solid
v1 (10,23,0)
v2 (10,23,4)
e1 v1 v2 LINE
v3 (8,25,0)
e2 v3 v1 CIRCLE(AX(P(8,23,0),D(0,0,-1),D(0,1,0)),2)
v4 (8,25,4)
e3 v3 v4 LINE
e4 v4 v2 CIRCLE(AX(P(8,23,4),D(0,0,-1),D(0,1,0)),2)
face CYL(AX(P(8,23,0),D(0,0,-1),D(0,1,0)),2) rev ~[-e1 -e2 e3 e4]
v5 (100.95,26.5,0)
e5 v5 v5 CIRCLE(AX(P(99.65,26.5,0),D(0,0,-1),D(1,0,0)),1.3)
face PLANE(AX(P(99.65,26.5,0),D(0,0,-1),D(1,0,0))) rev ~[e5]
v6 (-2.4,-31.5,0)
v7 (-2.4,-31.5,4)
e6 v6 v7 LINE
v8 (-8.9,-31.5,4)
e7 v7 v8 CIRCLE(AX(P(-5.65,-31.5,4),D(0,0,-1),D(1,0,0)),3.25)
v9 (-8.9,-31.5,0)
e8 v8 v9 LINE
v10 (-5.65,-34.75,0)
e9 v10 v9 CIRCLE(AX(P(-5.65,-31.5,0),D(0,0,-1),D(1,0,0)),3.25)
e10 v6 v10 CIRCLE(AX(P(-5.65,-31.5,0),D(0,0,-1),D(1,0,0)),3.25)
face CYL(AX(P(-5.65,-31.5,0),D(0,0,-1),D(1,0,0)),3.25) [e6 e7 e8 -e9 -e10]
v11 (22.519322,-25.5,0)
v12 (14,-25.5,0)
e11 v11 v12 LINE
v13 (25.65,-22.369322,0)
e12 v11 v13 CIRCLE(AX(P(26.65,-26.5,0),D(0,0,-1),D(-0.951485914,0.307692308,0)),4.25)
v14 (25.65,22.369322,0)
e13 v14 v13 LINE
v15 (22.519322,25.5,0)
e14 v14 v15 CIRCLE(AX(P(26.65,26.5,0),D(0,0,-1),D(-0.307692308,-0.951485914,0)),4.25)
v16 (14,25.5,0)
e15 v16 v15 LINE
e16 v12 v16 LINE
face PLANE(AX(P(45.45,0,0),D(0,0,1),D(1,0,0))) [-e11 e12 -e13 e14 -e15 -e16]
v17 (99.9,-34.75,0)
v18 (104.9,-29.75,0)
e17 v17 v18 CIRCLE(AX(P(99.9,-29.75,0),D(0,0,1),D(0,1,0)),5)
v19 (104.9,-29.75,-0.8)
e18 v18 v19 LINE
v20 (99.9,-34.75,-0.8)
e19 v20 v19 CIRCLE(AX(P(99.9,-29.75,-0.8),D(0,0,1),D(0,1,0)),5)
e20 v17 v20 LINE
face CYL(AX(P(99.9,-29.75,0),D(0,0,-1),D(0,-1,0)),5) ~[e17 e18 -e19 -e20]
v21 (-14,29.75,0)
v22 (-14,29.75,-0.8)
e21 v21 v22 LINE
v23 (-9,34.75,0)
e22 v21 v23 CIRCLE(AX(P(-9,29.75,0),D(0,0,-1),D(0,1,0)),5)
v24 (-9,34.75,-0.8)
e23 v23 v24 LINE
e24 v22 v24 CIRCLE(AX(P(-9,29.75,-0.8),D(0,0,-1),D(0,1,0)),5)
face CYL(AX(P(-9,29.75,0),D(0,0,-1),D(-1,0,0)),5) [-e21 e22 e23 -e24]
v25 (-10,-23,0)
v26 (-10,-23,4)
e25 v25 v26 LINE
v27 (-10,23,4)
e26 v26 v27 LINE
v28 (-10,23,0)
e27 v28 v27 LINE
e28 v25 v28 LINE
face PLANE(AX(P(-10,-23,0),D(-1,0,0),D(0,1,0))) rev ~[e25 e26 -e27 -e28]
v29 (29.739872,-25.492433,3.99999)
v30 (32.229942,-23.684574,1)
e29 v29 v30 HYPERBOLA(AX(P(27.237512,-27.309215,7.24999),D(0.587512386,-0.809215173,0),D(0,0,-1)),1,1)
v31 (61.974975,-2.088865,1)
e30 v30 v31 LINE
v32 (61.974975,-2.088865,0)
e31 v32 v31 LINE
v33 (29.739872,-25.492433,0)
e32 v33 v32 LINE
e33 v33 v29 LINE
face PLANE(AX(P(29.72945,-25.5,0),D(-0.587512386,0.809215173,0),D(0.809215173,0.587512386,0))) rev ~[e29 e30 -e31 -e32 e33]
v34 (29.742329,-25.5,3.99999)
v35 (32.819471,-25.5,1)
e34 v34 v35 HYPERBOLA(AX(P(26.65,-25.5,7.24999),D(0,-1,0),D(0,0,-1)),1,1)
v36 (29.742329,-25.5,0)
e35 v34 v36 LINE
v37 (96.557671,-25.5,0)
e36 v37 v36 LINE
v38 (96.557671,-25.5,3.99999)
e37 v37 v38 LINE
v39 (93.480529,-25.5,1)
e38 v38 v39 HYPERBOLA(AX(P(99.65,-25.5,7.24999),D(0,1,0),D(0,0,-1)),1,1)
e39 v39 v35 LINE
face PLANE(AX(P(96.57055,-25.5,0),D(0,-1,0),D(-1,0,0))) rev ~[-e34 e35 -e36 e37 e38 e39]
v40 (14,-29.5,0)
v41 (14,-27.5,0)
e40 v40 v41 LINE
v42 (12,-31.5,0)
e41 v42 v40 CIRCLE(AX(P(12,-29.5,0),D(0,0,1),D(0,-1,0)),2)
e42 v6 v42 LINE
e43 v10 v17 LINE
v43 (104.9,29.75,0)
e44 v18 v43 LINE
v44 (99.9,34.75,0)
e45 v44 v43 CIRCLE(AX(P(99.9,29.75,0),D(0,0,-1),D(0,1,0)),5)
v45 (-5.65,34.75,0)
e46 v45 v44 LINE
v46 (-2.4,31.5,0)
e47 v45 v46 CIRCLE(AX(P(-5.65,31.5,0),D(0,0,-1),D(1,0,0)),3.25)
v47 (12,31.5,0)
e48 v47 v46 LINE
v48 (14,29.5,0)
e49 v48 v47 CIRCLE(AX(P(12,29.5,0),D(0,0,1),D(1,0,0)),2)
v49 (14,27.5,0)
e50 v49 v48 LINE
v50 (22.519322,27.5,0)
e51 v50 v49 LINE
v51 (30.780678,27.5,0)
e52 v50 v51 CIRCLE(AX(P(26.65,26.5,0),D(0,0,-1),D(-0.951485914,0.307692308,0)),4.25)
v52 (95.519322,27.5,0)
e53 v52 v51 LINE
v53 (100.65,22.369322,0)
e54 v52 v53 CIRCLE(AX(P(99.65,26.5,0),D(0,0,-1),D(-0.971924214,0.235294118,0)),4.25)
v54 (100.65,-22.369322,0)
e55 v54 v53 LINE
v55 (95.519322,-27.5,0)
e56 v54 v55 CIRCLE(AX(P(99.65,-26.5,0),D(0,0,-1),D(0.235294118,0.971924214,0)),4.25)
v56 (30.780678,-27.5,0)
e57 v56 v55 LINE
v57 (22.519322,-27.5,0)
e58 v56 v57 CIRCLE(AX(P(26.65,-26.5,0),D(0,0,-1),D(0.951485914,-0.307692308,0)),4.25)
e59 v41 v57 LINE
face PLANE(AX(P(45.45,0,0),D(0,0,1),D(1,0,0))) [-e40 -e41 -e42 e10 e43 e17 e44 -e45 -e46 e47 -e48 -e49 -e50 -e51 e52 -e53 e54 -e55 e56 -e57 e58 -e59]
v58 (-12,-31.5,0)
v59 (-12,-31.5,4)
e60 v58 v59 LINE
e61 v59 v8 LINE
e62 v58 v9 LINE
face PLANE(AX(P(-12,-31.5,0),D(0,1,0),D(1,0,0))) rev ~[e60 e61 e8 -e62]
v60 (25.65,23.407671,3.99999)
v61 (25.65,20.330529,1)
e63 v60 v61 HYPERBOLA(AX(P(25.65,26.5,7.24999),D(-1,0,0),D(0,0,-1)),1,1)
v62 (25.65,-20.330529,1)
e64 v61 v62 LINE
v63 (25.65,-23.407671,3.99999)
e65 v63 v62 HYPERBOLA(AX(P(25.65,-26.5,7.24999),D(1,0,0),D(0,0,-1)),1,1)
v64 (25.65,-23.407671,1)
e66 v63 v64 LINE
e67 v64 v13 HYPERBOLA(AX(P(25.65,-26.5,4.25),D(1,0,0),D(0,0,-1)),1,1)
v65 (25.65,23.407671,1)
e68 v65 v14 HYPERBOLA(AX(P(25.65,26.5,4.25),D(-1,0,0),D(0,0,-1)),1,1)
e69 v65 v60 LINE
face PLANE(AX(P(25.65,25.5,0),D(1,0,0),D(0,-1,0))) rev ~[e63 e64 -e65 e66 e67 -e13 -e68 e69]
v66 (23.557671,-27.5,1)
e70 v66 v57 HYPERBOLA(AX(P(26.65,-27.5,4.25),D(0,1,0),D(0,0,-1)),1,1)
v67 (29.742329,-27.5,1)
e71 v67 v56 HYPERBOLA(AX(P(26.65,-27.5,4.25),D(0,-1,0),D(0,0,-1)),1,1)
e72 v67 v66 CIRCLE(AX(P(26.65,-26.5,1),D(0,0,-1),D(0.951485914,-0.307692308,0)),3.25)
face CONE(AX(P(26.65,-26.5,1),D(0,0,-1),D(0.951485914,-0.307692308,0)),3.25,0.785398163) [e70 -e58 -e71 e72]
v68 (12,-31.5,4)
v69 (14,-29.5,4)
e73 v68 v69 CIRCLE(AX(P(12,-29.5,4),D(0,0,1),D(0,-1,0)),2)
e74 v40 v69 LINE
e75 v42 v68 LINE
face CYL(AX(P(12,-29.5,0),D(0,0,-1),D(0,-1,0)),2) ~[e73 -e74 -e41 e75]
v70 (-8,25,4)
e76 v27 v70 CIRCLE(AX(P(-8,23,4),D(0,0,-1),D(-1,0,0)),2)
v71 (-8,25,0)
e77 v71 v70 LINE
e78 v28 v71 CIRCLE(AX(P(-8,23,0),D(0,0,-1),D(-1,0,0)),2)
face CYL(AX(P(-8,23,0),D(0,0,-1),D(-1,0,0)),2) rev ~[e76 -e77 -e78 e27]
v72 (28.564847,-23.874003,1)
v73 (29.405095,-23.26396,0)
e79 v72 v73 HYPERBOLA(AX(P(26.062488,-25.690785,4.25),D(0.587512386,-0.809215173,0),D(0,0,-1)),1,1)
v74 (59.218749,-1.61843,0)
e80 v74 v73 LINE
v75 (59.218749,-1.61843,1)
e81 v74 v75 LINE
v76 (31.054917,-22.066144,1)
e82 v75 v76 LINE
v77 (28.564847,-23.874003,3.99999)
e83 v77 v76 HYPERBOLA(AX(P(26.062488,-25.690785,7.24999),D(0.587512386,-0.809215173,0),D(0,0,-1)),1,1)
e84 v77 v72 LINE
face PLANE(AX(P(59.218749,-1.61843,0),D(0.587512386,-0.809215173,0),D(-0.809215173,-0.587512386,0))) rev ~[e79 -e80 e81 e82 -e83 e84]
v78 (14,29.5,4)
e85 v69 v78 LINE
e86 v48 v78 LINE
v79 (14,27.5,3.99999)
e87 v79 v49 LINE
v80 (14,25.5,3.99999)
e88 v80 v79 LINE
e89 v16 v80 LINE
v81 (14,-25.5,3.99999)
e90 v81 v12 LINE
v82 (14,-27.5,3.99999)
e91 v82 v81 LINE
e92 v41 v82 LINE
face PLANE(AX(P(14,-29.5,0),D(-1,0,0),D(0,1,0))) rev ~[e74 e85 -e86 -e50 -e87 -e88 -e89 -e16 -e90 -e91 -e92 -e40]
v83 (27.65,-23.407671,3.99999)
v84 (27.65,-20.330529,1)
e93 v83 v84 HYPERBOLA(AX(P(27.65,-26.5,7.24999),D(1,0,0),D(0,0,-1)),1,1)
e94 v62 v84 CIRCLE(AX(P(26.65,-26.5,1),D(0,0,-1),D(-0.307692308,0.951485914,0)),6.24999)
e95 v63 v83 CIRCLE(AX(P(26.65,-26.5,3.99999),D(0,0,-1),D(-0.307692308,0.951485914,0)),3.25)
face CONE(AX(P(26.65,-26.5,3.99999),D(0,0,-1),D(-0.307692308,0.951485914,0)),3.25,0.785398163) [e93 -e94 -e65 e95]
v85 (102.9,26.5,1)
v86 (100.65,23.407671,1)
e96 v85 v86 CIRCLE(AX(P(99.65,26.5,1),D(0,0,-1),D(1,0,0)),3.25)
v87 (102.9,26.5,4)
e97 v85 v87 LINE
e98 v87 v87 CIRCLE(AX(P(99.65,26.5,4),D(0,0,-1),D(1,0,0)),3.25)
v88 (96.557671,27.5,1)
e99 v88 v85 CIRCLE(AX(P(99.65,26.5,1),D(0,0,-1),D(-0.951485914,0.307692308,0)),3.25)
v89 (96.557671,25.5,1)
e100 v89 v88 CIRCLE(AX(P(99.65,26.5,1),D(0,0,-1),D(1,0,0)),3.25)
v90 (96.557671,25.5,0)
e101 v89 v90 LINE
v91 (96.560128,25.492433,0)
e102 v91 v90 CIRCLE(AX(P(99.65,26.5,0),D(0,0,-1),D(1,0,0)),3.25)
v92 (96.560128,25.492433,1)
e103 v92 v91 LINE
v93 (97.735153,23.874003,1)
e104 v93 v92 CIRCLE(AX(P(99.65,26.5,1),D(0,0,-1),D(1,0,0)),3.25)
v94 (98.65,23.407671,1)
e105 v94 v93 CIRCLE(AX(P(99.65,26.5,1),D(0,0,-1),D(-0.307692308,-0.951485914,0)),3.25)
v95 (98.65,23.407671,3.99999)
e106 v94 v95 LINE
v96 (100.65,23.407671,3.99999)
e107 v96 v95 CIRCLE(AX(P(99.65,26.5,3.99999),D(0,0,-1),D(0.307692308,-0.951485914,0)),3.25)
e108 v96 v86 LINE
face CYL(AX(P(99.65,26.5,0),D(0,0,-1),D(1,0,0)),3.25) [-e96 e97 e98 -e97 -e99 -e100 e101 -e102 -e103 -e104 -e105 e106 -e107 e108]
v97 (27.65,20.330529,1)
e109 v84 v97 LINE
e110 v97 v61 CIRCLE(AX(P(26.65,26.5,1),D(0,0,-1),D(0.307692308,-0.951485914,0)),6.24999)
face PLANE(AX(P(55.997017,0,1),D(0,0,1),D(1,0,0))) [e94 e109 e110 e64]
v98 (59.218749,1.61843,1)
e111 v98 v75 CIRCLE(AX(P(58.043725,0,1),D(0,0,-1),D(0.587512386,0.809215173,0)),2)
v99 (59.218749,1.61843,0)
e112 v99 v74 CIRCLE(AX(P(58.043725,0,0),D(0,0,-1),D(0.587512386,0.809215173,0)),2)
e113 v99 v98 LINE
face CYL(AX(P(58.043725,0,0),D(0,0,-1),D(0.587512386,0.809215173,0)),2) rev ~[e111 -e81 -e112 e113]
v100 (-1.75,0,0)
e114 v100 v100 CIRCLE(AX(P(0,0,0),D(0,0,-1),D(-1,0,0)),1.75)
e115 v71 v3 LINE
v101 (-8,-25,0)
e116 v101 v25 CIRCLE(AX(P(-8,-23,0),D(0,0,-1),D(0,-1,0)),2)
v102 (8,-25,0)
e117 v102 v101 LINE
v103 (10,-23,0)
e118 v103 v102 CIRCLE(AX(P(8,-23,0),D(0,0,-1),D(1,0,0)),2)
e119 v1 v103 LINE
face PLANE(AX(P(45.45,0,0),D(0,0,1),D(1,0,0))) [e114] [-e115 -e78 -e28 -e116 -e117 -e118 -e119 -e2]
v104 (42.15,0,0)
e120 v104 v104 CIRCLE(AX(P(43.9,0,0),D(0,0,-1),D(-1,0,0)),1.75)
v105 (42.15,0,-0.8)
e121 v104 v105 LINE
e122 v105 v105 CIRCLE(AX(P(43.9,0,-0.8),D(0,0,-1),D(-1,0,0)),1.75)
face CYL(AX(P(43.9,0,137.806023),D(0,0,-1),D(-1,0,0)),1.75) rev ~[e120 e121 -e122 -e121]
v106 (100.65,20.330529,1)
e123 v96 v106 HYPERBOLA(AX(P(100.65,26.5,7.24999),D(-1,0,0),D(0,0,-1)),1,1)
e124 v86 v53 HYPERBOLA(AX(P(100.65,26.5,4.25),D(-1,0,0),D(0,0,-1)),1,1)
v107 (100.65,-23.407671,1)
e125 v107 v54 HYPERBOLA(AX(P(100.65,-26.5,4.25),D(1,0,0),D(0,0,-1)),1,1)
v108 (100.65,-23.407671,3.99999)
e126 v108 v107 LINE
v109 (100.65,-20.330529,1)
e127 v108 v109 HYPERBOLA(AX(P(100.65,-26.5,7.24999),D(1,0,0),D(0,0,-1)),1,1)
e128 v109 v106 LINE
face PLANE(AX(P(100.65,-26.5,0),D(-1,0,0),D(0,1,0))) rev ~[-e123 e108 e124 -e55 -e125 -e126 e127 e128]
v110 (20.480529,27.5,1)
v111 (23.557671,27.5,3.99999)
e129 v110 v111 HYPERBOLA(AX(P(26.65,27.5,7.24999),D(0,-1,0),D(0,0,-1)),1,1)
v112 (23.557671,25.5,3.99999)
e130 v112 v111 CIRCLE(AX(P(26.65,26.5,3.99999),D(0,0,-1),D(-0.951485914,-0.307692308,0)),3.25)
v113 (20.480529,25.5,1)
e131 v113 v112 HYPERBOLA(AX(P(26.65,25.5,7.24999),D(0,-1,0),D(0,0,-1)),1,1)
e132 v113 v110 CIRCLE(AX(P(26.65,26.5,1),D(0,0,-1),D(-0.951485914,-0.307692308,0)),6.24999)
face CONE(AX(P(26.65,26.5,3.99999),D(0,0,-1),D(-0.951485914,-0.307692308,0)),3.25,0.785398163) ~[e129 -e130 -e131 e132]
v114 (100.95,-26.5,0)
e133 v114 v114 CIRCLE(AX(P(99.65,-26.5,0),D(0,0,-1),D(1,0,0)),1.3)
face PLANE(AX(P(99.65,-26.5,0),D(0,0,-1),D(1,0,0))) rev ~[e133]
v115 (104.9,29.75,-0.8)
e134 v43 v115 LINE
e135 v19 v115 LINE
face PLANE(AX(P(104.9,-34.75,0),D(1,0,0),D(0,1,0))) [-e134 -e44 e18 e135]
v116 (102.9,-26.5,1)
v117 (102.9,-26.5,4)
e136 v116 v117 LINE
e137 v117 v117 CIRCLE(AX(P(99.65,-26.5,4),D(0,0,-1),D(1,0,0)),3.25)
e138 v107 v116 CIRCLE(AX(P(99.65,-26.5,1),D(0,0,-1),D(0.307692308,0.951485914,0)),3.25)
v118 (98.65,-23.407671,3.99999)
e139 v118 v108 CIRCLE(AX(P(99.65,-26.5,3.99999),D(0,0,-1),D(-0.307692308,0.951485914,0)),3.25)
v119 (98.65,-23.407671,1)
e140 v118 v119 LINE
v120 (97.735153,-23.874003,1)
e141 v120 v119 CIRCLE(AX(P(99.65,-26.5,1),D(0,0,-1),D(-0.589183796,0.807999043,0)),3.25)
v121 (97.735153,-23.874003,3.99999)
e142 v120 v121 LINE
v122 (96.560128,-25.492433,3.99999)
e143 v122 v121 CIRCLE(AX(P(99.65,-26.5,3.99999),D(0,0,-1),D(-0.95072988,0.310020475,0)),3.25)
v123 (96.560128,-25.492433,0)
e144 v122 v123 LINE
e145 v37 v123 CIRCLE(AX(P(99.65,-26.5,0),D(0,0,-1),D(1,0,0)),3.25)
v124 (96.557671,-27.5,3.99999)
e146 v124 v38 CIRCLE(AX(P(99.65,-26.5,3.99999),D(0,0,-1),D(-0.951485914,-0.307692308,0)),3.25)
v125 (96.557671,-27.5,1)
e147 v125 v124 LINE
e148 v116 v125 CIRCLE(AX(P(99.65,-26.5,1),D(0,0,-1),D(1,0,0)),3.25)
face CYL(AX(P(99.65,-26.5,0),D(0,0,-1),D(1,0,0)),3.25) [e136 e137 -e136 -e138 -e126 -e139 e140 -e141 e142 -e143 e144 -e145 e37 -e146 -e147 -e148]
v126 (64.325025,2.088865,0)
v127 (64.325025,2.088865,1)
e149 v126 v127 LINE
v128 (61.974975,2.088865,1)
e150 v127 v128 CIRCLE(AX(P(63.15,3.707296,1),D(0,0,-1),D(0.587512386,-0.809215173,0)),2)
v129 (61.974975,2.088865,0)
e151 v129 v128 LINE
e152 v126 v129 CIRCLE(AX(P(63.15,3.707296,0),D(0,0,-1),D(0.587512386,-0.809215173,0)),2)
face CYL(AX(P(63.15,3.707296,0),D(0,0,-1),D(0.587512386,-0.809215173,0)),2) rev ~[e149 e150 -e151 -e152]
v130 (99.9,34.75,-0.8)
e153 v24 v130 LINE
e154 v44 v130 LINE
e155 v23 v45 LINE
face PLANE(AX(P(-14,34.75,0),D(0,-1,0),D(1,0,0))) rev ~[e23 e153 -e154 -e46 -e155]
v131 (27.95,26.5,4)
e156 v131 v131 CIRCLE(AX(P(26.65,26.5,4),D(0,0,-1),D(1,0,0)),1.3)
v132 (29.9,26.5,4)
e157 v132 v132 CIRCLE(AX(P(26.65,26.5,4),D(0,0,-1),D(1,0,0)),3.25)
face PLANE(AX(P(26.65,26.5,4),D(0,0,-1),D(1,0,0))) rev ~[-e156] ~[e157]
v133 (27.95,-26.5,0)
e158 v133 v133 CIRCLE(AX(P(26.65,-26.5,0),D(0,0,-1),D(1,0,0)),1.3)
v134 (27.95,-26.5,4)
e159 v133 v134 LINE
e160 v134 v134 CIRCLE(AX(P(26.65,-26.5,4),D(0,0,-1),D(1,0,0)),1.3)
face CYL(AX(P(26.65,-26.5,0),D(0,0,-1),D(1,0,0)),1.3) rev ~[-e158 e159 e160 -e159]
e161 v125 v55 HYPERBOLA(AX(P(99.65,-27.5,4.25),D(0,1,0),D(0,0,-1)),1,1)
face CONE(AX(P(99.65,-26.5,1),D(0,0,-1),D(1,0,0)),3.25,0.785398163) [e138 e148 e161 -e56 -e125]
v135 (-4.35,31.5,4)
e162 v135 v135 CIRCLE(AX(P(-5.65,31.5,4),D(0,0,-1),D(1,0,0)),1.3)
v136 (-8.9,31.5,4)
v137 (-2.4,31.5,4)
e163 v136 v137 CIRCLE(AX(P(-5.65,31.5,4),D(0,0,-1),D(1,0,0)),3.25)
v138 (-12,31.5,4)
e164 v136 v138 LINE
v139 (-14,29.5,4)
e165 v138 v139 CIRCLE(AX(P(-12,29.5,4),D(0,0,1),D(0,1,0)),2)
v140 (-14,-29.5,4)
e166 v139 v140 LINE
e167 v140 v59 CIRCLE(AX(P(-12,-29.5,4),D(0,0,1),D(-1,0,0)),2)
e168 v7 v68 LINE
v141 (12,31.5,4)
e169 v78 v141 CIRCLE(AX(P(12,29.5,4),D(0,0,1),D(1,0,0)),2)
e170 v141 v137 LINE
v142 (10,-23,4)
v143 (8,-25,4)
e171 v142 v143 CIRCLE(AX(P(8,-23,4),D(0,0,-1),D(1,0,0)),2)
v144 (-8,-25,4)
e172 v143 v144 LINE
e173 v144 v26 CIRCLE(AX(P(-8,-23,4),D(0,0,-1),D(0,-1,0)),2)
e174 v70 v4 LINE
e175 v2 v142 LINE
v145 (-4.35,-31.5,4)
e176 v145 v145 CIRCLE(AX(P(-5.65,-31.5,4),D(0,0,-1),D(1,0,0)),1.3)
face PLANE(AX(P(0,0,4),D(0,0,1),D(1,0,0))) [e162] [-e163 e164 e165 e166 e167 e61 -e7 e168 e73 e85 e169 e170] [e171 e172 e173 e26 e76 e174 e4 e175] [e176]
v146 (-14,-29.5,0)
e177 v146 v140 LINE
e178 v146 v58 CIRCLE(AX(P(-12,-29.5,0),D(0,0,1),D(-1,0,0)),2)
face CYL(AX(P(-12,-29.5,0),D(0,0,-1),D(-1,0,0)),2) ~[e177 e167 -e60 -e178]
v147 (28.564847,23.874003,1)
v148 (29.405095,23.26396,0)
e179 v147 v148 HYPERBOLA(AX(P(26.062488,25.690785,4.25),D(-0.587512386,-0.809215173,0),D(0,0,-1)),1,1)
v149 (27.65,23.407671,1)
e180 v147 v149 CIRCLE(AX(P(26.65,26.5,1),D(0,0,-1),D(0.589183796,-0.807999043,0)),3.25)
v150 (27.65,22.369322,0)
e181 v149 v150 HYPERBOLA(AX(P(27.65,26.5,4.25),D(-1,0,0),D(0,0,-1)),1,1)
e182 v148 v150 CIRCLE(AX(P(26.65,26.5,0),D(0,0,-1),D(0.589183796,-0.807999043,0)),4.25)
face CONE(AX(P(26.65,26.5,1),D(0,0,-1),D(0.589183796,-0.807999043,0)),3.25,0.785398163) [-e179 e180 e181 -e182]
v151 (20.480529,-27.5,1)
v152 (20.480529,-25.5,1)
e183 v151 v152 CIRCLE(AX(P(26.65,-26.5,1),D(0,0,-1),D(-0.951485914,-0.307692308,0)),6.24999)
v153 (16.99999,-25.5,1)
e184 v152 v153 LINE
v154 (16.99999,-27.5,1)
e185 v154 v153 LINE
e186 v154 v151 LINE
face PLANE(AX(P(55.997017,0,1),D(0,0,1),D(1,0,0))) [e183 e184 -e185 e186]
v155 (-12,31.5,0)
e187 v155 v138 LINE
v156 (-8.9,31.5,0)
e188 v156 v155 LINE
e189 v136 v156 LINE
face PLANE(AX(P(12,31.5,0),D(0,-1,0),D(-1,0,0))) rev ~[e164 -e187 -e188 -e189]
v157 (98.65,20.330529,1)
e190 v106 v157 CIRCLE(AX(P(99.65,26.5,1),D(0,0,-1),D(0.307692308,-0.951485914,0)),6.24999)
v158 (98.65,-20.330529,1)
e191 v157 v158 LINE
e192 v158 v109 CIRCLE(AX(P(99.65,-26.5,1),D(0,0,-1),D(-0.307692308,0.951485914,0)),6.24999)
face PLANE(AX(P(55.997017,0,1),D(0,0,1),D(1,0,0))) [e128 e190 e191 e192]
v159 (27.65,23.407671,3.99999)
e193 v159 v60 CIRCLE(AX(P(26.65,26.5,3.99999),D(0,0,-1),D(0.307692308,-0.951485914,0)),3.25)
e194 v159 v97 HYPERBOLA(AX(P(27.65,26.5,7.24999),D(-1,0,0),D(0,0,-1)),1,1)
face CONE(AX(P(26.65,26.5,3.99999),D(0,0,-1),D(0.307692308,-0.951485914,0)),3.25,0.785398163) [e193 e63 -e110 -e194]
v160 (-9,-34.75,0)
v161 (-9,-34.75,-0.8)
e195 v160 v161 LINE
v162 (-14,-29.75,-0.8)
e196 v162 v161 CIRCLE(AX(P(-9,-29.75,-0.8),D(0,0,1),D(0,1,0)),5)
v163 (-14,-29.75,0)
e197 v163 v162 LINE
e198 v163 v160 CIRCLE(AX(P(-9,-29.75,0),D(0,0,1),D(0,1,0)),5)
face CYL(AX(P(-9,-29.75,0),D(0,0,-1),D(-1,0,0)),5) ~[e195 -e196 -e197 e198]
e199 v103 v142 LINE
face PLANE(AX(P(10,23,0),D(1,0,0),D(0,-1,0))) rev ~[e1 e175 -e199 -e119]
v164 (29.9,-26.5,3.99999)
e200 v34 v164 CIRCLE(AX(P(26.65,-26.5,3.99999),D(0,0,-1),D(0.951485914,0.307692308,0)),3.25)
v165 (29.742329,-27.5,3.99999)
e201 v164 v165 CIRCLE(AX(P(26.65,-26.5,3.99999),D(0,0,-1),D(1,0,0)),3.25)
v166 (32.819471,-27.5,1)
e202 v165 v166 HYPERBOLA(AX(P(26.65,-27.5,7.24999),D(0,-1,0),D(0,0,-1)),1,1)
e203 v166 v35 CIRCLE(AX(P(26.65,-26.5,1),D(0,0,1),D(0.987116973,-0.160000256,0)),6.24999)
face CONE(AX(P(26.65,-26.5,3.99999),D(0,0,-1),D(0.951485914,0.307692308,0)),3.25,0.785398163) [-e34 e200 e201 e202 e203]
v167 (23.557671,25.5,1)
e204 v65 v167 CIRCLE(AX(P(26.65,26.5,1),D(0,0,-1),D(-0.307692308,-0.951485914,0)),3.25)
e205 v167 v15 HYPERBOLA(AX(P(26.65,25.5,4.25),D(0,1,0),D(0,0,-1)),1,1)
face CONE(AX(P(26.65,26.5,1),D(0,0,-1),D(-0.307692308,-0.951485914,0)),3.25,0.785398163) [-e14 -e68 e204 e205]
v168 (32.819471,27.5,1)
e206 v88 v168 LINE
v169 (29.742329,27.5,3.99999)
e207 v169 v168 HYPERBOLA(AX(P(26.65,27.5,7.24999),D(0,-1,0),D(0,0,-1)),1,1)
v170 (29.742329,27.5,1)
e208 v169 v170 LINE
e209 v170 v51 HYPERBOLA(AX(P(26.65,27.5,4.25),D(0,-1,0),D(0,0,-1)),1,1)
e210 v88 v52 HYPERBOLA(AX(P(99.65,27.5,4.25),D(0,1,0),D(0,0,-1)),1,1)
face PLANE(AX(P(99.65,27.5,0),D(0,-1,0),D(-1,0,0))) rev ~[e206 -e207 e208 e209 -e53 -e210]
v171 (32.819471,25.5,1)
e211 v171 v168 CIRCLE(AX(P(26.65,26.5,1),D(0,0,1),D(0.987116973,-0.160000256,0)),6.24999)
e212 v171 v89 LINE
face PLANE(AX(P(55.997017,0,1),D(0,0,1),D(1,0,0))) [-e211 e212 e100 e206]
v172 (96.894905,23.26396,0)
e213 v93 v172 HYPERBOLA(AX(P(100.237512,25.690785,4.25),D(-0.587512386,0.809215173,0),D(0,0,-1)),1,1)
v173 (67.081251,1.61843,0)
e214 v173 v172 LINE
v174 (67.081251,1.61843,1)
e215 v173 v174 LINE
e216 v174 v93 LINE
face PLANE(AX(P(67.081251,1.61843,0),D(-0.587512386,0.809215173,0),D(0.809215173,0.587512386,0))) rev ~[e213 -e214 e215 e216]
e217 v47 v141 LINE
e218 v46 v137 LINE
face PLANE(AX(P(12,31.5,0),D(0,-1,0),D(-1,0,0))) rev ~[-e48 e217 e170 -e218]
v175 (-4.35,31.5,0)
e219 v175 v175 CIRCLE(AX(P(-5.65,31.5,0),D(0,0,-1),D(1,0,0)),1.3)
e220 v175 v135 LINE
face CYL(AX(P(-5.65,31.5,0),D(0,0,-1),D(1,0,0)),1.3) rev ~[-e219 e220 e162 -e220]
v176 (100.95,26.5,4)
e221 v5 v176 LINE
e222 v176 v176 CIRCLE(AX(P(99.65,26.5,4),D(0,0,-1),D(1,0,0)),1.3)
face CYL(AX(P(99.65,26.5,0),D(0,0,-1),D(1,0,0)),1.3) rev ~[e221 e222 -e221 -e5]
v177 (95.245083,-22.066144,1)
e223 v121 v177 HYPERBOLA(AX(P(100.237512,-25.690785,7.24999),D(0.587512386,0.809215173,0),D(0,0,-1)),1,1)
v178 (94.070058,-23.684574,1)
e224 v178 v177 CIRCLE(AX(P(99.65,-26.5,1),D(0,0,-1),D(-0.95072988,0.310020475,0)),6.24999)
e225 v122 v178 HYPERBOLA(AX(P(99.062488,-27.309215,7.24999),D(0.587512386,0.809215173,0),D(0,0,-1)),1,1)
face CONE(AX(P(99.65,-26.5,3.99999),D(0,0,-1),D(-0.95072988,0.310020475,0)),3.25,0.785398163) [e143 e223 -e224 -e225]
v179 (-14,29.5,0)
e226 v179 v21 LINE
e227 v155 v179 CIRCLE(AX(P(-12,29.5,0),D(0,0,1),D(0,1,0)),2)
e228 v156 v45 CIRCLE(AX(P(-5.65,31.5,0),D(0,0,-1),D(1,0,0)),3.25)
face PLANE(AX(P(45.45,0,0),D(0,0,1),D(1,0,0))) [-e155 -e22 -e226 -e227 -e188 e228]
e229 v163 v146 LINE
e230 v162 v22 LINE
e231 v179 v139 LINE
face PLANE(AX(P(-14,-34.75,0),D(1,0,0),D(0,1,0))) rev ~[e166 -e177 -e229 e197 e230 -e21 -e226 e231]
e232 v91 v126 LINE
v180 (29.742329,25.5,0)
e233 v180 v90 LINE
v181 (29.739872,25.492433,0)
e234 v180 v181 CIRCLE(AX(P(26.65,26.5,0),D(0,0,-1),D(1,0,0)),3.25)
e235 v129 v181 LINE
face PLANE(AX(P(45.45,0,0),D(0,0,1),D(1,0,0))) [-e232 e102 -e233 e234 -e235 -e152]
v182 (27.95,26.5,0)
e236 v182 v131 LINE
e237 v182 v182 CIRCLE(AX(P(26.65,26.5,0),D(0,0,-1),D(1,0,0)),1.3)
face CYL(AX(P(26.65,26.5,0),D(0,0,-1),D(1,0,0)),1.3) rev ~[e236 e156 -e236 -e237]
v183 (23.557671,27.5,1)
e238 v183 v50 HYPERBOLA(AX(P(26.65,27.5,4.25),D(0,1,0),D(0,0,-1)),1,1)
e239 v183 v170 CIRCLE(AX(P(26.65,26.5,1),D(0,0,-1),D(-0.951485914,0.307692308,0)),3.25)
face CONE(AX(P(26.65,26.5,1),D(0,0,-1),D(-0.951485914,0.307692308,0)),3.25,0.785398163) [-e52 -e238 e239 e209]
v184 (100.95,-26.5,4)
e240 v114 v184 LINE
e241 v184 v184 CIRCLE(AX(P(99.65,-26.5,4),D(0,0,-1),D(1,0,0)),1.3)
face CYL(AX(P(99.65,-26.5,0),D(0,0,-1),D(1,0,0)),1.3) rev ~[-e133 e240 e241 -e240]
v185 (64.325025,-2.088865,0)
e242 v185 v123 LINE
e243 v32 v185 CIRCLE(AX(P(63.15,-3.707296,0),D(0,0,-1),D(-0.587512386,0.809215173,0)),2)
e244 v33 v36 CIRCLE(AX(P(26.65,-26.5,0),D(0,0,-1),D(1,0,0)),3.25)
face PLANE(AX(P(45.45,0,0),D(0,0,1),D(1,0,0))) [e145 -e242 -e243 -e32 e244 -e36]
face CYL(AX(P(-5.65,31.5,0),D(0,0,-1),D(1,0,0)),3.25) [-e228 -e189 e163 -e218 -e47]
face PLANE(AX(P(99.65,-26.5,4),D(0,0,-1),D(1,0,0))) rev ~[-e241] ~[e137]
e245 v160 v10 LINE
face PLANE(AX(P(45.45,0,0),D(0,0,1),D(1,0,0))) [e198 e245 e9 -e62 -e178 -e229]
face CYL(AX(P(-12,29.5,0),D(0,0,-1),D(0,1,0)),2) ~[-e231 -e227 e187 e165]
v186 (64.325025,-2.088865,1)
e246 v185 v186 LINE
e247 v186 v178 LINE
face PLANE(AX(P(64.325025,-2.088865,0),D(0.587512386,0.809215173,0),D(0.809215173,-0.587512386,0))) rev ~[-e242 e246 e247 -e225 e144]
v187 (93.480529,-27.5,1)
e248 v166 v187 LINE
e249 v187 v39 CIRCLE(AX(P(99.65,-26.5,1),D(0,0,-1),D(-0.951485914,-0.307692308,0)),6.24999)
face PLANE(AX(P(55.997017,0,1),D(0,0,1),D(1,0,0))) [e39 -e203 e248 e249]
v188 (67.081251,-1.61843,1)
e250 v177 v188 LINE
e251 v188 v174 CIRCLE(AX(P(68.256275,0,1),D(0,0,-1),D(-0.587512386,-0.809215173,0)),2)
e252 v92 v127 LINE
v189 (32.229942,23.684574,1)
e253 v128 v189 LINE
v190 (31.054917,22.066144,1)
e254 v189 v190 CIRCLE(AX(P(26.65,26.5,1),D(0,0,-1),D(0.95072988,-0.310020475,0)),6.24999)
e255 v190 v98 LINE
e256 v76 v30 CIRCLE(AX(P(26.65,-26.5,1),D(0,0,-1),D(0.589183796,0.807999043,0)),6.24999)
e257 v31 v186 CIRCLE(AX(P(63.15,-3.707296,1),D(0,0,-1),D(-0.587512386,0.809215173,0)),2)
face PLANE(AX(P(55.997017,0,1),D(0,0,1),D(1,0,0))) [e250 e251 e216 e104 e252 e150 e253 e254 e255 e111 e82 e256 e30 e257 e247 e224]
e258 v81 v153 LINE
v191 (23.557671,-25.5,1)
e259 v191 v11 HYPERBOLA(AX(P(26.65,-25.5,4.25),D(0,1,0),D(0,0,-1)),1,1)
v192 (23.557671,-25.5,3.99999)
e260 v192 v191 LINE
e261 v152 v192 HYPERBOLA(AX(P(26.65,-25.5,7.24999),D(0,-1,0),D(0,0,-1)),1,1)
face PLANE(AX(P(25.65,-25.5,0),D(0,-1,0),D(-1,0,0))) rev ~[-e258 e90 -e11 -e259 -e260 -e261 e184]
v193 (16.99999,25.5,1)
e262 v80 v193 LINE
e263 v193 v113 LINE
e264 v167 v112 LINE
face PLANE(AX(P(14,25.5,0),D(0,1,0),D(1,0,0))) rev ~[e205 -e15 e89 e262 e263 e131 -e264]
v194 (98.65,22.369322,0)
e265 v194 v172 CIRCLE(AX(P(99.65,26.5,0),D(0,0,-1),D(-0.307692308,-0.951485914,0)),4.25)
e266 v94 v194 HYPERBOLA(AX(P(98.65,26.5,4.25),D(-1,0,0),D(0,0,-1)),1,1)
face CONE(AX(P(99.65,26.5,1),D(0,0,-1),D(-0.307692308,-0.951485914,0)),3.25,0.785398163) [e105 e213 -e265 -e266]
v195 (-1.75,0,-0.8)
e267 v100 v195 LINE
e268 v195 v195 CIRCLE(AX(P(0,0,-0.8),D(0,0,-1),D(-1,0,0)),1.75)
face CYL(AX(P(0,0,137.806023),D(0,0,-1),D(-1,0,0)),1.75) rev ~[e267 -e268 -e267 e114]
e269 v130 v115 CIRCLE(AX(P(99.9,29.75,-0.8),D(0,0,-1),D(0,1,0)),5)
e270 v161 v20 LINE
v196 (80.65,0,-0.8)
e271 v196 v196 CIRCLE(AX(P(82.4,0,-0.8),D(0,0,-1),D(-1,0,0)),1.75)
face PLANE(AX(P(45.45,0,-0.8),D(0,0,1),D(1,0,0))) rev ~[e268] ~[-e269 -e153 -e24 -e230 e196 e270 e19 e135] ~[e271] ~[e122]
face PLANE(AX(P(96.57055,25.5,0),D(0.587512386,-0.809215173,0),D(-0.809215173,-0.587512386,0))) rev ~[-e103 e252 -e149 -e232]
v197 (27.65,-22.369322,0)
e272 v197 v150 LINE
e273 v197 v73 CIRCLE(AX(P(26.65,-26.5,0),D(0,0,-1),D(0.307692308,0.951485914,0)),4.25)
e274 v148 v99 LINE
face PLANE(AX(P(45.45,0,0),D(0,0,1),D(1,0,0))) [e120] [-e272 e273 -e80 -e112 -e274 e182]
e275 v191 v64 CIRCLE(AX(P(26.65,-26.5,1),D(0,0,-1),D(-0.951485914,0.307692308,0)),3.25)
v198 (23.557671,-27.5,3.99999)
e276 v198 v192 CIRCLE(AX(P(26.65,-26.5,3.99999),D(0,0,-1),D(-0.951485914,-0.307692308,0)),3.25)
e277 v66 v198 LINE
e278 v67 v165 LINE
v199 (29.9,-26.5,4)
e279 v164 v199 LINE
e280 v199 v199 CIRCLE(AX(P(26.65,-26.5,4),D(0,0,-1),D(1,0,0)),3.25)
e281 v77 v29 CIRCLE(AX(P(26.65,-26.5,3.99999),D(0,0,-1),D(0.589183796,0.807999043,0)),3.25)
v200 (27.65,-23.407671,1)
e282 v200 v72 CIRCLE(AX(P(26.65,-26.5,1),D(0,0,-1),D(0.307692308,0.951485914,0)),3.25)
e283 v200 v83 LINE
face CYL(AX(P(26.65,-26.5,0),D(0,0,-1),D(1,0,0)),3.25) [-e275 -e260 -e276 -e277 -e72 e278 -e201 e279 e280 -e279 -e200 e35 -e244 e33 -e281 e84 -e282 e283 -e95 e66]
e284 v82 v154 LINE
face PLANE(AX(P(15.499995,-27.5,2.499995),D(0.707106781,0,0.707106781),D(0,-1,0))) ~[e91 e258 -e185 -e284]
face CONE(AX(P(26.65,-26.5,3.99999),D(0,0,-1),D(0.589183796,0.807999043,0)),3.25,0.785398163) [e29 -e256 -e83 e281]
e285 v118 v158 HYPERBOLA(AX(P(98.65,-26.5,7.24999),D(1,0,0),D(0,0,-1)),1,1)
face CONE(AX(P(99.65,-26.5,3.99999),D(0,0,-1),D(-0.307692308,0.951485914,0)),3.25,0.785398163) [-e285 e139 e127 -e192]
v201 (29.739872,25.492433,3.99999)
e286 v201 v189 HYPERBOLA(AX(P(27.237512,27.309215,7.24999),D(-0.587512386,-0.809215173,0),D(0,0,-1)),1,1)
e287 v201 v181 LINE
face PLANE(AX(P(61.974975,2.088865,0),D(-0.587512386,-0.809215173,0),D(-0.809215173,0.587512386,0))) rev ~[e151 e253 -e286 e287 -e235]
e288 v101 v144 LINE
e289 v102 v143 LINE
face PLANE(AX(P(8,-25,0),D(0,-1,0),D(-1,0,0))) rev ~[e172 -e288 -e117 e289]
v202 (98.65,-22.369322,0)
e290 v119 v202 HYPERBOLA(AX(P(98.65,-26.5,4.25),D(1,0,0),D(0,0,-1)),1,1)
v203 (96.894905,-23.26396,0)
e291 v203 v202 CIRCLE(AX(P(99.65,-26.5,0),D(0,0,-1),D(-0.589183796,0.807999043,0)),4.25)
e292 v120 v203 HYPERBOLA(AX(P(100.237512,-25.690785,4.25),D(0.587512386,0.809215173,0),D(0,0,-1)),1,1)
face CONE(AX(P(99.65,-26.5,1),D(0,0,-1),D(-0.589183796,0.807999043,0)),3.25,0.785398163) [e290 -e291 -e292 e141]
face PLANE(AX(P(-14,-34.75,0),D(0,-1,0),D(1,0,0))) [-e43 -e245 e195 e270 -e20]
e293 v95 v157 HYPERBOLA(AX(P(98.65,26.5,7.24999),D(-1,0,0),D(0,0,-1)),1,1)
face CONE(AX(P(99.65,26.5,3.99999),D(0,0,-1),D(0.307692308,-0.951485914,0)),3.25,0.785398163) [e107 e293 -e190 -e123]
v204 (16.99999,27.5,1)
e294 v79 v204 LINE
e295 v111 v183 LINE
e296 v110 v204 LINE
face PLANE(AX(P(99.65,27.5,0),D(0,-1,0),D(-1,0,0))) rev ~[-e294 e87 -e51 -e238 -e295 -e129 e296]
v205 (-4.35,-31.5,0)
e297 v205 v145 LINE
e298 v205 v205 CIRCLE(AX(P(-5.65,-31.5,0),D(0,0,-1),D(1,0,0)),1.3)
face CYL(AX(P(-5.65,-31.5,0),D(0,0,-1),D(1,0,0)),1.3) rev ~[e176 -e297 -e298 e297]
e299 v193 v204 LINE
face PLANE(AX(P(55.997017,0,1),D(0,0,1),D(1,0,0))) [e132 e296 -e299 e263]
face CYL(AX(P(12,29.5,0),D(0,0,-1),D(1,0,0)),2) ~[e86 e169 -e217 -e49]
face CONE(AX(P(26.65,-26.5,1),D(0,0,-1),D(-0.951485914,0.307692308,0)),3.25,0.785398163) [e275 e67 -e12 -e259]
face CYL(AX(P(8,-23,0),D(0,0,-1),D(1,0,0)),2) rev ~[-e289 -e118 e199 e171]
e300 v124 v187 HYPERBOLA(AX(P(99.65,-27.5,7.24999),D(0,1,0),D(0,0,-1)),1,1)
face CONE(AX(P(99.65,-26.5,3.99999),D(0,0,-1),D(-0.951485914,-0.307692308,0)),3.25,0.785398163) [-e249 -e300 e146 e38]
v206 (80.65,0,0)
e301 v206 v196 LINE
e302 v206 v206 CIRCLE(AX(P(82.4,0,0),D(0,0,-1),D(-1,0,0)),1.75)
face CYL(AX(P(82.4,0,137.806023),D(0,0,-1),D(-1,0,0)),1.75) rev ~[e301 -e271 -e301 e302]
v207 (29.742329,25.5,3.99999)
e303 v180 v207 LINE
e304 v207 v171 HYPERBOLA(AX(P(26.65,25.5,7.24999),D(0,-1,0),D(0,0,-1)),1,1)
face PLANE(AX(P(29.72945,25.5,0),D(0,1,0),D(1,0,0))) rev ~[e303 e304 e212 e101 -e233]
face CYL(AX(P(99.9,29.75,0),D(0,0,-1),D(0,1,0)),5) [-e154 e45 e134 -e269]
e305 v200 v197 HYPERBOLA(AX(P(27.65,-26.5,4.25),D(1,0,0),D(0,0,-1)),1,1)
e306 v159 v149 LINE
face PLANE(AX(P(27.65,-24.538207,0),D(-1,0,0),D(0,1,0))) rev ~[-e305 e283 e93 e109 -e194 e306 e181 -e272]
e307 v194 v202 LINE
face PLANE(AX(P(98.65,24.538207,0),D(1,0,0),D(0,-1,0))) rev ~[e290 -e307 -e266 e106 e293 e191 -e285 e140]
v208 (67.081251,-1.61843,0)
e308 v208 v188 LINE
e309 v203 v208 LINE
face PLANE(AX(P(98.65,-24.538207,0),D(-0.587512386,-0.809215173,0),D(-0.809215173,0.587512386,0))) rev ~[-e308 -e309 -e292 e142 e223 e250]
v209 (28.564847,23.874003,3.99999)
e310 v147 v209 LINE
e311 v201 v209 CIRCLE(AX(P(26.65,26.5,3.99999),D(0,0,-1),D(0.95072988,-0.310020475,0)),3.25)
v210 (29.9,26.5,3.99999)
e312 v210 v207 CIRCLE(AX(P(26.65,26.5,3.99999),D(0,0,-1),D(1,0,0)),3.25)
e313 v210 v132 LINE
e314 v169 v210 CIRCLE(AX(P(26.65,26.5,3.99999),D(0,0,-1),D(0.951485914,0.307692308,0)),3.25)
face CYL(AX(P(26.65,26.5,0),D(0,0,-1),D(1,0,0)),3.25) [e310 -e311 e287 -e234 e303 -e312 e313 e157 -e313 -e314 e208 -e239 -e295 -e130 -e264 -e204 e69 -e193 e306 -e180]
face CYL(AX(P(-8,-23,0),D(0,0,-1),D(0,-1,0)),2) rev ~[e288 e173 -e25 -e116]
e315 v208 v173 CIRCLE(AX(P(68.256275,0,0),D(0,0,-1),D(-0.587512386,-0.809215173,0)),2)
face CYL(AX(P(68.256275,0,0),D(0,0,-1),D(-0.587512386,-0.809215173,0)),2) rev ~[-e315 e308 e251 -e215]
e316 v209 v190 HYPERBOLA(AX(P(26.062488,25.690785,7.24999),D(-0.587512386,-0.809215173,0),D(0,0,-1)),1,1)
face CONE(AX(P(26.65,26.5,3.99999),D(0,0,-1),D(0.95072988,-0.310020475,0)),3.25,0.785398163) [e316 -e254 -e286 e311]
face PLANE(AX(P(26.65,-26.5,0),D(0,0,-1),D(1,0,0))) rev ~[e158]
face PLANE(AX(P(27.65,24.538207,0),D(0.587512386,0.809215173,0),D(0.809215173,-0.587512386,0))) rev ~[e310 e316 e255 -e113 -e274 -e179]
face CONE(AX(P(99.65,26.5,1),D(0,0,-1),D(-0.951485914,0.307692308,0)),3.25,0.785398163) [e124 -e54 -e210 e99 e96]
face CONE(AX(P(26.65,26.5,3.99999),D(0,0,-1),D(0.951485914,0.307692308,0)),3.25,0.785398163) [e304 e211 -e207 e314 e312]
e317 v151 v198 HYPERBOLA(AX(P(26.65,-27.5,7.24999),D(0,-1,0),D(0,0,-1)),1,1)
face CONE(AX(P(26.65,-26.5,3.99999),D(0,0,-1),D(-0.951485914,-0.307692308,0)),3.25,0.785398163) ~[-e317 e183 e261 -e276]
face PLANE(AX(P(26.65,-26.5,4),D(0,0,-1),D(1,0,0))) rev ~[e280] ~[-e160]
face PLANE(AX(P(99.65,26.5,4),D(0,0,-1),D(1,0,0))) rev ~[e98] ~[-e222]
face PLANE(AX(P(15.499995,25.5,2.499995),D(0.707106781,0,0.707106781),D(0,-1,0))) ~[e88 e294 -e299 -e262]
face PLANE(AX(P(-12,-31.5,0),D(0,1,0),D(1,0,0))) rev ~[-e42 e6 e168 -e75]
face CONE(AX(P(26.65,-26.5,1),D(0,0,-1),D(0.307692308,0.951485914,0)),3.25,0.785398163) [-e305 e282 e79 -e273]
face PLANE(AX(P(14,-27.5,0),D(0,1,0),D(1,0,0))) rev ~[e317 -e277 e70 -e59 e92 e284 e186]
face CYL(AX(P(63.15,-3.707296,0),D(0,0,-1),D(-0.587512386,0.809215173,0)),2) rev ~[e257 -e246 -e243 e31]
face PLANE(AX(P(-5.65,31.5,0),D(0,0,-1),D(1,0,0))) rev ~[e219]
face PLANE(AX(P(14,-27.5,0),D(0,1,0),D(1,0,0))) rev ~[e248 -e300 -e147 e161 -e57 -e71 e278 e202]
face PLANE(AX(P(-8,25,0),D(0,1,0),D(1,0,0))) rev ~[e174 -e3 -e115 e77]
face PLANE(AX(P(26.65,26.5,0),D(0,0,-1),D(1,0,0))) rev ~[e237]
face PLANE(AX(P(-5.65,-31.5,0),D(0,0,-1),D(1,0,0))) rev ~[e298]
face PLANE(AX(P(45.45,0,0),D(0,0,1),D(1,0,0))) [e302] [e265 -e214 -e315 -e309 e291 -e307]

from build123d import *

# Parameters (mm, degrees)
F3_DEPTH  = 4
F5_DEPTH  = 1
F6_R      = 3.25
F7_DEPTH  = 4
F8_W      = 118.9
F8_H      = 69.5
F9_DEPTH  = 0.8
F10_R     = 5
F11_D     = 2.6
F11_DEPTH = 4.001
F12_SIZE  = 2.99999
F13_SIZE  = 1
F14_D     = 3.5


# Not quite as in the source:
# - a fillet or chamfer is up to 0.001 mm smaller than in the source, because OpenCascade refuses the exact size
# - after a boolean that leaves OpenCascade's solid faulty, fix() repairs it


with BuildPart() as f3:
    # F2 (on Top) → F3 (new body)
    with BuildSketch(Plane.XY):
        with BuildLine():
            Line((12, 31.5), (-12, 31.5))
            ThreePointArc((-12, 31.5), (-13.4142135624, 30.9142135624), (-14, 29.5))
            Line((-14, 29.5), (-14, -29.5))
            ThreePointArc((-14, -29.5), (-13.4142135624, -30.9142135624), (-12, -31.5))
            Line((-12, -31.5), (12, -31.5))
            ThreePointArc((12, -31.5), (13.4142135624, -30.9142135624), (14, -29.5))
            Line((14, -29.5), (14, 29.5))
            ThreePointArc((14, 29.5), (13.4142135624, 30.9142135624), (12, 31.5))
        make_face()
        with BuildLine():
            ThreePointArc((10, -23), (9.4142135624, -24.4142135624), (8, -25))
            Line((8, -25), (-8, -25))
            ThreePointArc((-8, -25), (-9.4142135624, -24.4142135624), (-10, -23))
            Line((-10, -23), (-10, 23))
            ThreePointArc((-10, 23), (-9.4142135624, 24.4142135624), (-8, 25))
            Line((-8, 25), (8, 25))
            ThreePointArc((8, 25), (9.4142135624, 24.4142135624), (10, 23))
            Line((10, 23), (10, -23))
        make_face(mode=Mode.SUBTRACT)
    extrude(amount=F3_DEPTH)

    # F4 (on Top) → F5 (join)
    with BuildSketch(Plane.XY):
        with BuildLine():
            ThreePointArc((100.65, 26.5), (100.3571067812, 27.2071067812), (99.65, 27.5))
            Line((99.65, 27.5), (14, 27.5))
            ThreePointArc((14, 27.5), (13, 26.5), (14, 25.5))
            Line((14, 25.5), (25.65, 25.5))
            Line((25.65, 25.5), (25.65, -25.5))
            Line((25.65, -25.5), (14, -25.5))
            ThreePointArc((14, -25.5), (13, -26.5), (14, -27.5))
            Line((14, -27.5), (99.65, -27.5))
            ThreePointArc((99.65, -27.5), (100.3571067812, -27.2071067812), (100.65, -26.5))
            Line((100.65, -26.5), (100.65, 26.5))
        make_face()
        with BuildLine():
            Line((64.3250247719, -2.0888654384), (96.5705497341, -25.5))
            Line((96.5705497341, -25.5), (29.7294502659, -25.5))
            Line((29.7294502659, -25.5), (61.9749752281, -2.0888654384))
            ThreePointArc((61.9749752281, -2.0888654384), (63.15, -1.7072957846), (64.3250247719, -2.0888654384))
        make_face(mode=Mode.SUBTRACT)
        with BuildLine():
            Line((59.218749446, -1.6184303462), (27.65, -24.5382073412))
            Line((27.65, -24.5382073412), (27.65, 24.5382073412))
            Line((27.65, 24.5382073412), (59.218749446, 1.6184303462))
            ThreePointArc((59.218749446, 1.6184303462), (60.0437246741, 0), (59.218749446, -1.6184303462))
        make_face(mode=Mode.SUBTRACT)
        with BuildLine():
            Line((61.9749752281, 2.0888654384), (29.7294502659, 25.5))
            Line((29.7294502659, 25.5), (96.5705497341, 25.5))
            Line((96.5705497341, 25.5), (64.3250247719, 2.0888654384))
            ThreePointArc((64.3250247719, 2.0888654384), (63.15, 1.7072957846), (61.9749752281, 2.0888654384))
        make_face(mode=Mode.SUBTRACT)
        with BuildLine():
            Line((67.081250554, 1.6184303462), (98.65, 24.5382073412))
            Line((98.65, 24.5382073412), (98.65, -24.5382073412))
            Line((98.65, -24.5382073412), (67.081250554, -1.6184303462))
            ThreePointArc((67.081250554, -1.6184303462), (66.2562753259, 0), (67.081250554, 1.6184303462))
        make_face(mode=Mode.SUBTRACT)
    extrude(amount=F5_DEPTH)

    # F6 (on face) → F7 (join)
    with BuildSketch(Plane(origin=(0, 0, 0), x_dir=(1, 0, 0), z_dir=(0, 0, -1))):
        with Locations((-5.65, -31.5)):
            Circle(F6_R)
        with Locations((-5.65, 31.5)):
            Circle(F6_R)
        with Locations((99.65, 26.5)):
            Circle(F6_R)
        with Locations((99.65, -26.5)):
            Circle(F6_R)
        with Locations((26.65, -26.5)):
            Circle(F6_R)
        with Locations((26.65, 26.5)):
            Circle(F6_R)
    extrude(amount=-F7_DEPTH)

    # F8 (on Top) → F9 (join)
    with BuildSketch(Plane.XY):
        with Locations((45.45, 0)):
            Rectangle(F8_W, F8_H)
    extrude(amount=-F9_DEPTH)

    # F10
    f10_edges = [f3.edges().sort_by_distance(p)[0] for p in [
        (-14, -34.75, -0.4),
        (-14, 34.75, -0.4),
        (104.9, 34.75, -0.4),
        (104.9, -34.75, -0.4),
    ]]
    fillet(f10_edges, radius=F10_R)

    # F11 (through all, one way)
    with BuildSketch(Plane(origin=(0, 0, 0), x_dir=(1, 0, 0), z_dir=(0, 0, -1))):
        with Locations((99.65, -26.5), (26.65, -26.5), (-5.65, -31.5), (-5.65, 31.5), (26.65, 26.5), (99.65, 26.5)):
            Circle(F11_D / 2)
    extrude(amount=-F11_DEPTH, mode=Mode.SUBTRACT)

    # F12 (size 3 in the source; OpenCascade refuses exactly that, so slightly less here)
    f12_edges = [f3.edges().sort_by_distance(p)[0] for p in [
        (29.279949, -24.590585, 1),
        (29.279949, 24.590585, 1),
        (97.020051, -24.590585, 1),
        (14, -26.5, 1),
        (14, 26.5, 1),
        (29.86034, -27.006177, 1),
        (23.4, -26.5, 1),
        (26.65, -23.25, 1),
        (29.86034, -25.993823, 1),
        (96.4, -26.5, 1),
        (99.65, -23.25, 1),
        (29.86034, 25.993823, 1),
        (26.65, 23.25, 1),
        (23.4, 26.5, 1),
        (29.86034, 27.006177, 1),
        (99.65, 23.25, 1),
    ]]
    chamfer(f12_edges, length=F12_SIZE)

    # F13
    f13_edges = [f3.edges().sort_by_distance(p)[0] for p in [
        (24.351903, 24.201903, 0),
        (28.125957, 23.604478, 0),
        (26.65, 29.75, 0),
        (26.65, -29.75, 0),
        (24.351903, -24.201903, 0),
        (28.125957, -23.604478, 0),
        (102.277975, -24.587868, 0),
        (98.174043, -23.604478, 0),
        (100.156177, 29.71034, 0),
        (98.174043, 23.604478, 0),
        (100.156177, -29.71034, 0),
        (102.277975, 24.587868, 0),
    ]]
    chamfer(f13_edges, length=F13_SIZE)

    # F14 (through all)
    with Locations(Plane.XY):
        with Locations((0, 0), (43.9, 0), (82.4, 0)):
            Hole(F14_D / 2)

    add(f3.part.fix(), mode=Mode.REPLACE)


solid = f3.part
